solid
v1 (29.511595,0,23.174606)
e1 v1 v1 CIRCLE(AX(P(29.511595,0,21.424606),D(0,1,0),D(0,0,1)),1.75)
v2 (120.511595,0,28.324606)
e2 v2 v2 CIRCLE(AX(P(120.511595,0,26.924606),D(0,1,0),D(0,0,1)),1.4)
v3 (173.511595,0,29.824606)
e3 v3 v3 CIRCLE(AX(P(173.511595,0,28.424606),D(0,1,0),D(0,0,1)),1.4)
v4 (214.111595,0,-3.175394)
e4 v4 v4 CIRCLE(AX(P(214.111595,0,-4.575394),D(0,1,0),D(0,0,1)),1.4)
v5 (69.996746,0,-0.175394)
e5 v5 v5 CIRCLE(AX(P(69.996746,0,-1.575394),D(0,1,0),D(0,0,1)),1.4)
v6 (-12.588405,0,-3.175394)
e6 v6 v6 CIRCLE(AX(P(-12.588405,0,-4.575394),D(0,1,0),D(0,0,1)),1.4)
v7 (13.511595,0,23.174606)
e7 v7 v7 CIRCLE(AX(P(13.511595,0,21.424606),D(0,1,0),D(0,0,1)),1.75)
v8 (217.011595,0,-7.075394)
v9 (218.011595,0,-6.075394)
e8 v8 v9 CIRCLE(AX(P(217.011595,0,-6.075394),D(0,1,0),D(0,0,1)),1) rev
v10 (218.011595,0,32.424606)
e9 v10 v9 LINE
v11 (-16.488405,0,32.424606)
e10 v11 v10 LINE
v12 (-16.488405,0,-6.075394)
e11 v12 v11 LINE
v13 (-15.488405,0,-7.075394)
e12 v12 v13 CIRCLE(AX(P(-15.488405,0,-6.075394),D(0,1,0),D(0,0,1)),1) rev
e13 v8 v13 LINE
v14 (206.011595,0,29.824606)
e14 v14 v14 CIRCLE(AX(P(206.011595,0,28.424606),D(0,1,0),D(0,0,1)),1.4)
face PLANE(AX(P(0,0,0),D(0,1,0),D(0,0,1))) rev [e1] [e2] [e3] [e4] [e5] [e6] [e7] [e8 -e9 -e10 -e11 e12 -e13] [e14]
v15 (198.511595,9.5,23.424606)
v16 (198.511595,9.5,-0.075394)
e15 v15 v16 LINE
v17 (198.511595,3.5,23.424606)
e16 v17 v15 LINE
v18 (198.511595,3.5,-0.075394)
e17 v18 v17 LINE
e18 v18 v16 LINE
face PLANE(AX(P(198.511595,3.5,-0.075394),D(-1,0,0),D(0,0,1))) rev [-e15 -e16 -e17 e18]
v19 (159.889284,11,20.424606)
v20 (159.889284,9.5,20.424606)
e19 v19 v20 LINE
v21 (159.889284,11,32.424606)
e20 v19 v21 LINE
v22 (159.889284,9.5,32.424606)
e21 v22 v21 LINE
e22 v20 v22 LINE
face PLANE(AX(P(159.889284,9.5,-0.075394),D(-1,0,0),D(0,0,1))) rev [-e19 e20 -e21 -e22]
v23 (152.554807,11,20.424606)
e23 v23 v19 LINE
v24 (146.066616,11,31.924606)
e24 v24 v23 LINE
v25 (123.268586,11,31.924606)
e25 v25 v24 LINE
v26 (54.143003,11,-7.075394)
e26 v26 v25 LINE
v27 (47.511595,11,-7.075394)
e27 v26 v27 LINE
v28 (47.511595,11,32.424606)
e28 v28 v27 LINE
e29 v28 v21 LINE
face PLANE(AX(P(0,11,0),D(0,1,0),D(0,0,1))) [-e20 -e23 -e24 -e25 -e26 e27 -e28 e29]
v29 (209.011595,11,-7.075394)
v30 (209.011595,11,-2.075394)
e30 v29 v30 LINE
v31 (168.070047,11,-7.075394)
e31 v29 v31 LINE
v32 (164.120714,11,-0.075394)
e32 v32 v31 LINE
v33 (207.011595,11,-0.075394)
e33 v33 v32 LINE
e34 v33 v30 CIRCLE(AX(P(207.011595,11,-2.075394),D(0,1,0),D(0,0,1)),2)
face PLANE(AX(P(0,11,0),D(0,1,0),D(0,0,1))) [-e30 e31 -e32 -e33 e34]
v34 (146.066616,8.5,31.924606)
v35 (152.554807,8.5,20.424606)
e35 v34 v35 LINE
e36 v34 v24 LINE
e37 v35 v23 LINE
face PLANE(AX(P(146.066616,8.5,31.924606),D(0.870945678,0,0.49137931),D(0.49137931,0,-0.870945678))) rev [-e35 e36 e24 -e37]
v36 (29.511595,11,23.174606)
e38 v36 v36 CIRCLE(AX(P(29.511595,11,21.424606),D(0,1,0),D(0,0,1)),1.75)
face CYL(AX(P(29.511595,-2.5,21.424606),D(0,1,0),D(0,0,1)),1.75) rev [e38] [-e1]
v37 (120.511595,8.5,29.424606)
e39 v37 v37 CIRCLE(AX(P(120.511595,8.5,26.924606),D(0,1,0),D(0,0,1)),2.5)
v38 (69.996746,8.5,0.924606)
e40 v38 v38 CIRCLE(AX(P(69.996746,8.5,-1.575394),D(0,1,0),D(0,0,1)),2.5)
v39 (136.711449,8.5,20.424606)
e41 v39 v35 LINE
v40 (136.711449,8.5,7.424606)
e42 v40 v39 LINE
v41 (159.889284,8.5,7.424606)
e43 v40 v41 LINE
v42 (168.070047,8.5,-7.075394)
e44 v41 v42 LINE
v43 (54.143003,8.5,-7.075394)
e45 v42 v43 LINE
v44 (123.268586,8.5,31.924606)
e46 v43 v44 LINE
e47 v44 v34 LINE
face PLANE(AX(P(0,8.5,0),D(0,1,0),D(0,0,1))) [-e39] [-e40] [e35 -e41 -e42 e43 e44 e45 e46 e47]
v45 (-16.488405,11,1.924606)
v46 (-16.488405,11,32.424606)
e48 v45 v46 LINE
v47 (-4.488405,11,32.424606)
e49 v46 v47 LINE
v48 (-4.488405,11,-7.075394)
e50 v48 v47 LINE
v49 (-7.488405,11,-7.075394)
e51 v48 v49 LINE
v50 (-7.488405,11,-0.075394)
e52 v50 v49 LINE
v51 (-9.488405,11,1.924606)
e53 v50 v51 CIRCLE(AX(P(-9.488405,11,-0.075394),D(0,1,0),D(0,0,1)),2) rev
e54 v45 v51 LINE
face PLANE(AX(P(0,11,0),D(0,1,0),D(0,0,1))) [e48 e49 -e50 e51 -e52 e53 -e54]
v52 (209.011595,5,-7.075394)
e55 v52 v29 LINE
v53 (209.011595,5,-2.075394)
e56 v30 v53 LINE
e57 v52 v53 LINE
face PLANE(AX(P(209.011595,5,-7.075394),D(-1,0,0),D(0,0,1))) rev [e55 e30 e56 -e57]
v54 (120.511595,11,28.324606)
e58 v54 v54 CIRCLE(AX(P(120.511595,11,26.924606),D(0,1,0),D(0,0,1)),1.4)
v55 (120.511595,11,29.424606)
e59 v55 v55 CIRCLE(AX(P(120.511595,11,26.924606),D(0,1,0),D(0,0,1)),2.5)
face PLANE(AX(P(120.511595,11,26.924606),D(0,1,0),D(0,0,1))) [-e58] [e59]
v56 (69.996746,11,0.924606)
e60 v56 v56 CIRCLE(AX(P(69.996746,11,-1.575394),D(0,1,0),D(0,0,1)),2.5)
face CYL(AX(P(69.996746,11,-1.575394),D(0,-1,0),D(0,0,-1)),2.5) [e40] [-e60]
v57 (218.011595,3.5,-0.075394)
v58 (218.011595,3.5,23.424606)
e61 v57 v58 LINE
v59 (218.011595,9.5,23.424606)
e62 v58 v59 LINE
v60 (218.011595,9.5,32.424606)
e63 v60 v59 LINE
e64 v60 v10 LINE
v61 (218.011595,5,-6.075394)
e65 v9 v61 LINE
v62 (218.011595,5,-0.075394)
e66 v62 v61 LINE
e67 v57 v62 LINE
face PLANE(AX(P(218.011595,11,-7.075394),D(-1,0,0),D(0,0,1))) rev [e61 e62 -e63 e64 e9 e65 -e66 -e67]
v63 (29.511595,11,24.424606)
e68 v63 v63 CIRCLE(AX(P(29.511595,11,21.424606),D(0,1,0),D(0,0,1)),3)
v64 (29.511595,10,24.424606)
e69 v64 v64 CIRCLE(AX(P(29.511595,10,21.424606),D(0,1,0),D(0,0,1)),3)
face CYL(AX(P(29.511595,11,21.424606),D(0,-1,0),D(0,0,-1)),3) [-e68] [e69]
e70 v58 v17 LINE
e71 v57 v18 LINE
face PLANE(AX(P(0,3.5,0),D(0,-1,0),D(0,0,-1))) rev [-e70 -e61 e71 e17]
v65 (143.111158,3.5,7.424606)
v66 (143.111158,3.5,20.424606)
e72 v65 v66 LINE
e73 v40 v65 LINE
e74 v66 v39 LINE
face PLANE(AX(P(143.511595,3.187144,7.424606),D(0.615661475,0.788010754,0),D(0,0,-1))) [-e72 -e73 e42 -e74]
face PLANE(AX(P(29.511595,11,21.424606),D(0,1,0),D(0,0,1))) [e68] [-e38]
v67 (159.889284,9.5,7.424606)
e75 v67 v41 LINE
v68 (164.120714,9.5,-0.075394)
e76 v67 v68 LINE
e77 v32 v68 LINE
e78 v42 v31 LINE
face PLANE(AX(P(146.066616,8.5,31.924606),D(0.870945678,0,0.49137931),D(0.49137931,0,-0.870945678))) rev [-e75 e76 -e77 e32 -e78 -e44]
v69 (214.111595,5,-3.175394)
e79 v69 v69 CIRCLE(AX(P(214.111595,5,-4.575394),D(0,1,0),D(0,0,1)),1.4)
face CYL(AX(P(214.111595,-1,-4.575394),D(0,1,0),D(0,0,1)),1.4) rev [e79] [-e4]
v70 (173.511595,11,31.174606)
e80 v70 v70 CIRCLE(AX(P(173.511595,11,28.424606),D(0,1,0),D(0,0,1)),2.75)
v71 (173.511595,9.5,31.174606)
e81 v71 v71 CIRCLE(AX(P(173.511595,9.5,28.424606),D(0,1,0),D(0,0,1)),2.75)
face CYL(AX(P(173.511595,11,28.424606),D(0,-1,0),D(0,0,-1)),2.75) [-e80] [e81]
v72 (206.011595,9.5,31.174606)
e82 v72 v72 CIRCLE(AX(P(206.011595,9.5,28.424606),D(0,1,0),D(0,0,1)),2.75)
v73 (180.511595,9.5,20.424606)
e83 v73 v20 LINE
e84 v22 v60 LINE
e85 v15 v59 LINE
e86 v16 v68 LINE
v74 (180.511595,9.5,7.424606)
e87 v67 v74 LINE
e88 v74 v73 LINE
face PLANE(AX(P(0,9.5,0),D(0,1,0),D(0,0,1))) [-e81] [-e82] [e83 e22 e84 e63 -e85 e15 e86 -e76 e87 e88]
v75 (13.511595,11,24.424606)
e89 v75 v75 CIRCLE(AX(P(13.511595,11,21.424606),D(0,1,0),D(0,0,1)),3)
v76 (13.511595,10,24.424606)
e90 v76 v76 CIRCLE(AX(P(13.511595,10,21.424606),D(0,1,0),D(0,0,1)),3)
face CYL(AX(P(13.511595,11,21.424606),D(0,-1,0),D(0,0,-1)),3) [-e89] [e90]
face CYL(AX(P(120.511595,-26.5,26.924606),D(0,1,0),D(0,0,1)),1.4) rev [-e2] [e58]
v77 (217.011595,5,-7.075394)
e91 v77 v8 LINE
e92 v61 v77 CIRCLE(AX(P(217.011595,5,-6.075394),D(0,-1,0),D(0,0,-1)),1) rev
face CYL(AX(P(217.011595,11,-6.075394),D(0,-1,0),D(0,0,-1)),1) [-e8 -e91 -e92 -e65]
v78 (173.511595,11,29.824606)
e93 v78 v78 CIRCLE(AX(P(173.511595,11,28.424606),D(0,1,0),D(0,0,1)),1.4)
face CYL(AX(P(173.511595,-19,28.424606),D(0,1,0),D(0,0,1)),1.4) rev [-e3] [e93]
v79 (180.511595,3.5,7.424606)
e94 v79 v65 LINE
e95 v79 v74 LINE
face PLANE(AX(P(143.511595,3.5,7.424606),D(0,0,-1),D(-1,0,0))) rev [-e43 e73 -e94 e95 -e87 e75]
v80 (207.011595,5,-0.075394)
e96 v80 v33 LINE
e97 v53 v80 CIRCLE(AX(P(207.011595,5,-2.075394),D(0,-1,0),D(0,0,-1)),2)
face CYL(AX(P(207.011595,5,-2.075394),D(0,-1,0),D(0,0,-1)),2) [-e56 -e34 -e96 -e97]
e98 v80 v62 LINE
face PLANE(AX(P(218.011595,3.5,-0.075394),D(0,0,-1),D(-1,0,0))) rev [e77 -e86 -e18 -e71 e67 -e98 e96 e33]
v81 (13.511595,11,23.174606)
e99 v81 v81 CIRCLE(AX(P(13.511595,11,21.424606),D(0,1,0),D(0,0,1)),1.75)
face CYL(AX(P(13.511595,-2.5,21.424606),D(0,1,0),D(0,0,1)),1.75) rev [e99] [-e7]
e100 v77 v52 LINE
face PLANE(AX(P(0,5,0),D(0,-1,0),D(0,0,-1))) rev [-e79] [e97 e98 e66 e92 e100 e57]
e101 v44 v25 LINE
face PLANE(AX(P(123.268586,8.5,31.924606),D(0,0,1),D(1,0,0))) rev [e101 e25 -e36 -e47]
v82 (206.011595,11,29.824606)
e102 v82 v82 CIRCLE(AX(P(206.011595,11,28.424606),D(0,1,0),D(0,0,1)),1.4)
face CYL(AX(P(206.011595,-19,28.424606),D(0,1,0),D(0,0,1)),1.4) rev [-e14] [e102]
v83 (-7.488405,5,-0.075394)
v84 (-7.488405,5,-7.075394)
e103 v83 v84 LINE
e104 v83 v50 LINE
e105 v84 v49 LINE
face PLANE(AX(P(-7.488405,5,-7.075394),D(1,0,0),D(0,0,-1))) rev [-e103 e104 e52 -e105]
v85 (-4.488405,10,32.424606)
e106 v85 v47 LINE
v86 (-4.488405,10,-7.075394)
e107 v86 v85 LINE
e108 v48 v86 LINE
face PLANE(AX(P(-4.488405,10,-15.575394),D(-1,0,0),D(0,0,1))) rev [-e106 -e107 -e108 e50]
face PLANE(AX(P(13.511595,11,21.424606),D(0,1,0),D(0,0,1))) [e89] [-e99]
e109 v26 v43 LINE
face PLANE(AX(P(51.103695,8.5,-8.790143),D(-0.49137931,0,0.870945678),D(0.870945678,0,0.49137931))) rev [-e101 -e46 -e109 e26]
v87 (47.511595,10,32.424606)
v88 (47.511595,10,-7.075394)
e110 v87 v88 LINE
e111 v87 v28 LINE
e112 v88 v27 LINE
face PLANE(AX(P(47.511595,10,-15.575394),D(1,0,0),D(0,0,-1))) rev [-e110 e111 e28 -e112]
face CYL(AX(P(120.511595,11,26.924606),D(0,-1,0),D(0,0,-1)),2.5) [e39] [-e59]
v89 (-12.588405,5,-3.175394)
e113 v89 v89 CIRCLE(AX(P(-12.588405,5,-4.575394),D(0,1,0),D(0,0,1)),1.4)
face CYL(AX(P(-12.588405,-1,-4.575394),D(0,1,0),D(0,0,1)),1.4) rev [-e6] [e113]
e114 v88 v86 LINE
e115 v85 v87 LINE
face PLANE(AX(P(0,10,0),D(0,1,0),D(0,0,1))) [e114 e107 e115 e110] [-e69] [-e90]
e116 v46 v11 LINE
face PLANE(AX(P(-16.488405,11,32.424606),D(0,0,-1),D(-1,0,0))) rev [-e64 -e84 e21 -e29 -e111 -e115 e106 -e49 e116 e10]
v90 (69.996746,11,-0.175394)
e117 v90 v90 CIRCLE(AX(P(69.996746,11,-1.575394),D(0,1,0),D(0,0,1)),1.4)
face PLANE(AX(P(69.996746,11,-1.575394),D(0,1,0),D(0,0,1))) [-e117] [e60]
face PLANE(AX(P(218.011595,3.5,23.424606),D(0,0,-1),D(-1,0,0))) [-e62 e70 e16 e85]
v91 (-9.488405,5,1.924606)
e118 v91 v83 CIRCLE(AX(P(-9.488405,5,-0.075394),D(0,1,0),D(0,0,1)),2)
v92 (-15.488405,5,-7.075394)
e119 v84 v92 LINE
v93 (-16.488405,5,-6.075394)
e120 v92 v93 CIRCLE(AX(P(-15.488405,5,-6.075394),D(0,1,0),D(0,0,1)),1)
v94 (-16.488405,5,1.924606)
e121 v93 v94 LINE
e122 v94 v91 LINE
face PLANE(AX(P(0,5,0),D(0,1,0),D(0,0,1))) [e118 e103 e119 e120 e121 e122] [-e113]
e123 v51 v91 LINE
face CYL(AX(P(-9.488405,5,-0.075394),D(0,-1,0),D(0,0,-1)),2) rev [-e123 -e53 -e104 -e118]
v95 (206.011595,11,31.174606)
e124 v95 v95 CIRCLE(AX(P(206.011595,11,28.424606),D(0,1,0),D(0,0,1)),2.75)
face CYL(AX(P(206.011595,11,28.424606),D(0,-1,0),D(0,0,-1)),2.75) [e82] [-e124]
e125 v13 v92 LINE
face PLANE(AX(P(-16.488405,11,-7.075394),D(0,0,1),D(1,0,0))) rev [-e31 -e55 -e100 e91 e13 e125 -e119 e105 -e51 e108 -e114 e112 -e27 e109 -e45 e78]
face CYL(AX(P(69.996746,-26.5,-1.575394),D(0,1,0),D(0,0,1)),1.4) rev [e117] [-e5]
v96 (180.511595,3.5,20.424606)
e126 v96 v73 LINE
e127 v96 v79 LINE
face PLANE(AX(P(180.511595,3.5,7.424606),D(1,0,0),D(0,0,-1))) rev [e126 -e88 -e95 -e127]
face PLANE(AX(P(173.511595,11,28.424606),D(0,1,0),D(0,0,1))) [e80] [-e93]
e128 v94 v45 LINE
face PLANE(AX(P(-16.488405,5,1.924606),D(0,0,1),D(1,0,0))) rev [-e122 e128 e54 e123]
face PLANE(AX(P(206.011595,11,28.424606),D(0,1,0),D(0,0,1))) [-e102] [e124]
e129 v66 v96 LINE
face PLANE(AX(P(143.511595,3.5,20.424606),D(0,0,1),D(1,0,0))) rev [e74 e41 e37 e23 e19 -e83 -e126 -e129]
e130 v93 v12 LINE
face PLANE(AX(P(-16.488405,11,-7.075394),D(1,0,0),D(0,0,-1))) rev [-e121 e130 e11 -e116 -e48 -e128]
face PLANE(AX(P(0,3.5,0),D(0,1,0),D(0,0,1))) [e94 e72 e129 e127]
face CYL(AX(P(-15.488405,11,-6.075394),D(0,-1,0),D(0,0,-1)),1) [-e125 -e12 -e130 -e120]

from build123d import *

# Parameters (mm, degrees)
SKETCH_1_W           = 234.5
SKETCH_1_H           = 39.5
EXTRUDE_1_DEPTH      = 11
SKETCH_2_W           = 9
SKETCH_2_H           = 9
SKETCH_2_H_2         = 7
CUT_EXTRUDE_1_DEPTH  = 6
FILLET_2_R           = 2
SKETCH_3_R           = 1.4
CUT_EXTRUDE_2_DEPTH  = 6
FILLET_5_R           = 1
SKETCH_4_R           = 1.4
CUT_EXTRUDE_3_DEPTH  = 30
SKETCH_6_W           = 19.5
SKETCH_6_H           = 23.5
CUT_EXTRUDE_4_DEPTH  = 7.5
FILLET_7_R           = 2
SKETCH_7_W           = 37
SKETCH_7_H           = 13
CUT_EXTRUDE_5_DEPTH  = 7.5
CHAMFER_1_SIZE       = 10
CHAMFER_1_SIZE_2     = 7.812856265
SKETCH_8_R           = 1.4
CUT_EXTRUDE_6_DEPTH  = 37.5
CUT_EXTRUDE_8_DEPTH  = 2.5
SKETCH_10_R          = 1.75
CUT_EXTRUDE_9_DEPTH  = 13.5
SKETCH_11_W          = 52
SKETCH_11_H          = 48
CUT_EXTRUDE_10_DEPTH = 1
EXTRUDE_START        = 1
SKETCH_12_R          = 3
SKETCH_12_R_2        = 1.75
EXTRUDE_2_DEPTH      = 1
EXTRUDE_START_2      = 2.5
SKETCH_13_R          = 2.5
SKETCH_13_R_2        = 1.4
EXTRUDE_3_DEPTH      = 2.5
SKETCH_14_W          = 58.122310869
SKETCH_14_H          = 32.5
CUT_EXTRUDE_11_DEPTH = 1.5
EXTRUDE_START_3      = 1.5
SKETCH_15_R          = 2.75
SKETCH_15_R_2        = 1.4
EXTRUDE_4_DEPTH      = 1.5
CUT_EXTRUDE_12_DEPTH = 2.5


# Some blends are built 0.0001 mm under size
with BuildPart() as part:
    # 草图1 → 凸台-拉伸1 (new body)
    with BuildSketch(Plane(origin=(0, 0, 0), x_dir=(1, 0, 0), z_dir=(0, 1, 0))):
        with Locations((100.761595342, -12.674606198)):
            Rectangle(SKETCH_1_W, SKETCH_1_H)
    extrude(amount=EXTRUDE_1_DEPTH)

    # 草图2 → 切除-拉伸1 (cut)
    with BuildSketch(Plane(origin=(0, 11, 0), x_dir=(1, 0, 0), z_dir=(0, 1, 0))):
        with Locations((-11.988404658, 2.575393802)):
            Rectangle(SKETCH_2_W, SKETCH_2_H)
        with Locations((213.511595342, 3.575393802)):
            Rectangle(SKETCH_2_W, SKETCH_2_H_2)
    extrude(amount=-CUT_EXTRUDE_1_DEPTH, mode=Mode.SUBTRACT)

    # 圆角2
    fillet_2_edges = [part.edges().sort_by_distance(p)[0] for p in [
        (-7.488404658, 8, 1.924606198),
        (209.011595342, 8, -0.075393802),
    ]]
    fillet(fillet_2_edges, radius=FILLET_2_R)

    # 草图3 → 切除-拉伸2 (cut)
    with BuildSketch(Plane(origin=(0, 5, 0), x_dir=(1, 0, 0), z_dir=(0, 1, 0))):
        with Locations(Location((214.111595342, 4.575393802, 0), (0, 0, 270))):
            Circle(SKETCH_3_R)
        with Locations(Location((-12.588404658, 4.575393802, 0), (0, 0, 270))):
            Circle(SKETCH_3_R)
    extrude(amount=-CUT_EXTRUDE_2_DEPTH, mode=Mode.SUBTRACT)

    # 圆角5
    fillet_5_edges = [part.edges().sort_by_distance(p)[0] for p in [
        (-16.488404658, 2.5, -7.075393802),
        (218.011595342, 2.5, -7.075393802),
    ]]
    fillet(fillet_5_edges, radius=FILLET_5_R)

    # 草图4 → 切除-拉伸3 (cut)
    with BuildSketch(Plane(origin=(0, 11, 0), x_dir=(1, 0, 0), z_dir=(0, 1, 0))):
        with Locations(Location((206.011595342, -28.424606198, 0), (0, 0, 270))):
            Circle(SKETCH_4_R)
        with Locations(Location((173.511595342, -28.424606198, 0), (0, 0, 270))):
            Circle(SKETCH_4_R)
    extrude(amount=-CUT_EXTRUDE_3_DEPTH, mode=Mode.SUBTRACT)

    # 草图6 → 切除-拉伸4 (cut)
    with BuildSketch(Plane(origin=(0, 11, 0), x_dir=(1, 0, 0), z_dir=(0, 1, 0))):
        with Locations((208.261595342, -11.674606198)):
            Rectangle(SKETCH_6_W, SKETCH_6_H)
    extrude(amount=-CUT_EXTRUDE_4_DEPTH, mode=Mode.SUBTRACT)

    # 圆角7
    fillet_7_edges = [part.edges().sort_by_distance(p)[0] for p in [
        (211.011595342, 8, -0.075393802),
    ]]
    fillet(fillet_7_edges, radius=FILLET_7_R - 0.0001)  # a hair under: the kernel refuses the full size

    # 草图7 → 切除-拉伸5 (cut)
    with BuildSketch(Plane(origin=(0, 11, 0), x_dir=(1, 0, 0), z_dir=(0, 1, 0))):
        with Locations((162.011595342, -13.924606198)):
            Rectangle(SKETCH_7_W, SKETCH_7_H)
    extrude(amount=-CUT_EXTRUDE_5_DEPTH, mode=Mode.SUBTRACT)

    # 倒角1
    # the kernel refuses this chamfer: 10, 7.812856265 mm, written as the material it takes off along each edge
    with BuildSketch(Plane(origin=(143.511595342, 11, 20.424606198), x_dir=(-0.9997151392093143, 0.023867141339117017, 0), z_dir=(0, 0, -1))) as chamfer_1_piece_1_section:
        Polygon((CHAMFER_1_SIZE * 0.999715139209, -CHAMFER_1_SIZE * 0.0238671413391), (-CHAMFER_1_SIZE_2 * 0.0238671413393, -CHAMFER_1_SIZE_2 * 0.999715139218), (0, 0), align=None)
    chamfer_1_piece_1 = extrude(amount=13, mode=Mode.PRIVATE)
    chamfer_1_piece_1 = split(chamfer_1_piece_1, bisect_by=Plane(origin=(140.173122789, 3.5, 13.924606198), z_dir=(0, 1, 0)), keep=Keep.TOP, mode=Mode.PRIVATE)
    add(chamfer_1_piece_1, mode=Mode.SUBTRACT)

    # 草图8 → 切除-拉伸6 (cut)
    with BuildSketch(Plane(origin=(0, 11, 0), x_dir=(1, 0, 0), z_dir=(0, 1, 0))):
        with Locations(Location((120.511595342, -26.924606198, 0), (0, 0, 270))):
            Circle(SKETCH_8_R)
        with Locations(Location((69.99674604, 1.575393802, 0), (0, 0, 270))):
            Circle(SKETCH_8_R)
    extrude(amount=-CUT_EXTRUDE_6_DEPTH, mode=Mode.SUBTRACT)

    # 草图9 → 切除-拉伸8 (cut)
    with BuildSketch(Plane(origin=(0, 11, 0), x_dir=(1, 0, 0), z_dir=(0, 1, 0))):
        Polygon((51.103694557, 8.790142976), (123.268586448, -31.924606198), (150.036795822, 15.520729333), (77.871903931, 56.235478507), align=None)
    extrude(amount=-CUT_EXTRUDE_8_DEPTH, mode=Mode.SUBTRACT)

    # 草图10 → 切除-拉伸9 (cut)
    with BuildSketch(Plane(origin=(0, 11, 0), x_dir=(1, 0, 0), z_dir=(0, 1, 0))):
        with Locations(Location((13.511595342, -21.424606198, 0), (0, 0, 270))):
            Circle(SKETCH_10_R)
        with Locations(Location((29.511595342, -21.424606198, 0), (0, 0, 270))):
            Circle(SKETCH_10_R)
    extrude(amount=-CUT_EXTRUDE_9_DEPTH, mode=Mode.SUBTRACT)

    # 草图11 → 切除-拉伸10 (cut)
    with BuildSketch(Plane(origin=(0, 11, 0), x_dir=(1, 0, 0), z_dir=(0, 1, 0))):
        with Locations((21.511595342, -8.424606198)):
            Rectangle(SKETCH_11_W, SKETCH_11_H)
    extrude(amount=-CUT_EXTRUDE_10_DEPTH, mode=Mode.SUBTRACT)

    # 草图12 → 凸台-拉伸2 (add)
    # profile 1 of 2: a face of its own
    with BuildSketch(Plane(origin=(0, 10, 0), x_dir=(1, 0, 0), z_dir=(0, 1, 0)).offset(EXTRUDE_START)):
        with Locations(Location((13.511595342, -21.424606198, 0), (0, 0, 270))):
            Circle(SKETCH_12_R)
        with Locations(Location((13.511595342, -21.424606198, 0), (0, 0, 270))):
            Circle(SKETCH_12_R_2, mode=Mode.SUBTRACT)
    # profile 2 of 2: a face of its own
    with BuildSketch(Plane(origin=(0, 10, 0), x_dir=(1, 0, 0), z_dir=(0, 1, 0)).offset(EXTRUDE_START)):
        with Locations(Location((29.511595342, -21.424606198, 0), (0, 0, 270))):
            Circle(SKETCH_12_R)
        with Locations(Location((29.511595342, -21.424606198, 0), (0, 0, 270))):
            Circle(SKETCH_12_R_2, mode=Mode.SUBTRACT)
    extrude(amount=-EXTRUDE_2_DEPTH)

    # 草图13 → 凸台-拉伸3 (add)
    # profile 1 of 2: a face of its own
    with BuildSketch(Plane(origin=(0, 8.5, 0), x_dir=(1, 0, 0), z_dir=(0, 1, 0)).offset(EXTRUDE_START_2)):
        with Locations(Location((69.99674604, 1.575393802, 0), (0, 0, 270))):
            Circle(SKETCH_13_R)
        with Locations(Location((69.99674604, 1.575393802, 0), (0, 0, 270))):
            Circle(SKETCH_13_R_2, mode=Mode.SUBTRACT)
    # profile 2 of 2: a face of its own
    with BuildSketch(Plane(origin=(0, 8.5, 0), x_dir=(1, 0, 0), z_dir=(0, 1, 0)).offset(EXTRUDE_START_2)):
        with Locations(Location((120.511595342, -26.924606198, 0), (0, 0, 270))):
            Circle(SKETCH_13_R)
        with Locations(Location((120.511595342, -26.924606198, 0), (0, 0, 270))):
            Circle(SKETCH_13_R_2, mode=Mode.SUBTRACT)
    extrude(amount=-EXTRUDE_3_DEPTH)

    # 草图14 → 切除-拉伸11 (cut)
    with BuildSketch(Plane(origin=(0, 11, 0), x_dir=(1, 0, 0), z_dir=(0, 1, 0))):
        with Locations((188.950439908, -16.174606198)):
            Rectangle(SKETCH_14_W, SKETCH_14_H)
    extrude(amount=-CUT_EXTRUDE_11_DEPTH, mode=Mode.SUBTRACT)

    # 草图15 → 凸台-拉伸4 (add)
    # profile 1 of 2: a face of its own
    with BuildSketch(Plane(origin=(0, 9.5, 0), x_dir=(1, 0, 0), z_dir=(0, 1, 0)).offset(EXTRUDE_START_3)):
        with Locations(Location((173.511595342, -28.424606198, 0), (0, 0, 270))):
            Circle(SKETCH_15_R)
        with Locations(Location((173.511595342, -28.424606198, 0), (0, 0, 270))):
            Circle(SKETCH_15_R_2, mode=Mode.SUBTRACT)
    # profile 2 of 2: a face of its own
    with BuildSketch(Plane(origin=(0, 9.5, 0), x_dir=(1, 0, 0), z_dir=(0, 1, 0)).offset(EXTRUDE_START_3)):
        with Locations(Location((206.011595342, -28.424606198, 0), (0, 0, 270))):
            Circle(SKETCH_15_R)
        with Locations(Location((206.011595342, -28.424606198, 0), (0, 0, 270))):
            Circle(SKETCH_15_R_2, mode=Mode.SUBTRACT)
    extrude(amount=-EXTRUDE_4_DEPTH)

    # 草图16 → 切除-拉伸12 (cut)
    with BuildSketch(Plane(origin=(0, 11, 0), x_dir=(1, 0, 0), z_dir=(0, 1, 0))):
        Polygon((123.268586448, -31.924606198), (146.066616294, -31.924606198), (168.070047273, 7.075393802), (145.272017426, 7.075393802), align=None)
    extrude(amount=-CUT_EXTRUDE_12_DEPTH, mode=Mode.SUBTRACT)


solid = part.part
